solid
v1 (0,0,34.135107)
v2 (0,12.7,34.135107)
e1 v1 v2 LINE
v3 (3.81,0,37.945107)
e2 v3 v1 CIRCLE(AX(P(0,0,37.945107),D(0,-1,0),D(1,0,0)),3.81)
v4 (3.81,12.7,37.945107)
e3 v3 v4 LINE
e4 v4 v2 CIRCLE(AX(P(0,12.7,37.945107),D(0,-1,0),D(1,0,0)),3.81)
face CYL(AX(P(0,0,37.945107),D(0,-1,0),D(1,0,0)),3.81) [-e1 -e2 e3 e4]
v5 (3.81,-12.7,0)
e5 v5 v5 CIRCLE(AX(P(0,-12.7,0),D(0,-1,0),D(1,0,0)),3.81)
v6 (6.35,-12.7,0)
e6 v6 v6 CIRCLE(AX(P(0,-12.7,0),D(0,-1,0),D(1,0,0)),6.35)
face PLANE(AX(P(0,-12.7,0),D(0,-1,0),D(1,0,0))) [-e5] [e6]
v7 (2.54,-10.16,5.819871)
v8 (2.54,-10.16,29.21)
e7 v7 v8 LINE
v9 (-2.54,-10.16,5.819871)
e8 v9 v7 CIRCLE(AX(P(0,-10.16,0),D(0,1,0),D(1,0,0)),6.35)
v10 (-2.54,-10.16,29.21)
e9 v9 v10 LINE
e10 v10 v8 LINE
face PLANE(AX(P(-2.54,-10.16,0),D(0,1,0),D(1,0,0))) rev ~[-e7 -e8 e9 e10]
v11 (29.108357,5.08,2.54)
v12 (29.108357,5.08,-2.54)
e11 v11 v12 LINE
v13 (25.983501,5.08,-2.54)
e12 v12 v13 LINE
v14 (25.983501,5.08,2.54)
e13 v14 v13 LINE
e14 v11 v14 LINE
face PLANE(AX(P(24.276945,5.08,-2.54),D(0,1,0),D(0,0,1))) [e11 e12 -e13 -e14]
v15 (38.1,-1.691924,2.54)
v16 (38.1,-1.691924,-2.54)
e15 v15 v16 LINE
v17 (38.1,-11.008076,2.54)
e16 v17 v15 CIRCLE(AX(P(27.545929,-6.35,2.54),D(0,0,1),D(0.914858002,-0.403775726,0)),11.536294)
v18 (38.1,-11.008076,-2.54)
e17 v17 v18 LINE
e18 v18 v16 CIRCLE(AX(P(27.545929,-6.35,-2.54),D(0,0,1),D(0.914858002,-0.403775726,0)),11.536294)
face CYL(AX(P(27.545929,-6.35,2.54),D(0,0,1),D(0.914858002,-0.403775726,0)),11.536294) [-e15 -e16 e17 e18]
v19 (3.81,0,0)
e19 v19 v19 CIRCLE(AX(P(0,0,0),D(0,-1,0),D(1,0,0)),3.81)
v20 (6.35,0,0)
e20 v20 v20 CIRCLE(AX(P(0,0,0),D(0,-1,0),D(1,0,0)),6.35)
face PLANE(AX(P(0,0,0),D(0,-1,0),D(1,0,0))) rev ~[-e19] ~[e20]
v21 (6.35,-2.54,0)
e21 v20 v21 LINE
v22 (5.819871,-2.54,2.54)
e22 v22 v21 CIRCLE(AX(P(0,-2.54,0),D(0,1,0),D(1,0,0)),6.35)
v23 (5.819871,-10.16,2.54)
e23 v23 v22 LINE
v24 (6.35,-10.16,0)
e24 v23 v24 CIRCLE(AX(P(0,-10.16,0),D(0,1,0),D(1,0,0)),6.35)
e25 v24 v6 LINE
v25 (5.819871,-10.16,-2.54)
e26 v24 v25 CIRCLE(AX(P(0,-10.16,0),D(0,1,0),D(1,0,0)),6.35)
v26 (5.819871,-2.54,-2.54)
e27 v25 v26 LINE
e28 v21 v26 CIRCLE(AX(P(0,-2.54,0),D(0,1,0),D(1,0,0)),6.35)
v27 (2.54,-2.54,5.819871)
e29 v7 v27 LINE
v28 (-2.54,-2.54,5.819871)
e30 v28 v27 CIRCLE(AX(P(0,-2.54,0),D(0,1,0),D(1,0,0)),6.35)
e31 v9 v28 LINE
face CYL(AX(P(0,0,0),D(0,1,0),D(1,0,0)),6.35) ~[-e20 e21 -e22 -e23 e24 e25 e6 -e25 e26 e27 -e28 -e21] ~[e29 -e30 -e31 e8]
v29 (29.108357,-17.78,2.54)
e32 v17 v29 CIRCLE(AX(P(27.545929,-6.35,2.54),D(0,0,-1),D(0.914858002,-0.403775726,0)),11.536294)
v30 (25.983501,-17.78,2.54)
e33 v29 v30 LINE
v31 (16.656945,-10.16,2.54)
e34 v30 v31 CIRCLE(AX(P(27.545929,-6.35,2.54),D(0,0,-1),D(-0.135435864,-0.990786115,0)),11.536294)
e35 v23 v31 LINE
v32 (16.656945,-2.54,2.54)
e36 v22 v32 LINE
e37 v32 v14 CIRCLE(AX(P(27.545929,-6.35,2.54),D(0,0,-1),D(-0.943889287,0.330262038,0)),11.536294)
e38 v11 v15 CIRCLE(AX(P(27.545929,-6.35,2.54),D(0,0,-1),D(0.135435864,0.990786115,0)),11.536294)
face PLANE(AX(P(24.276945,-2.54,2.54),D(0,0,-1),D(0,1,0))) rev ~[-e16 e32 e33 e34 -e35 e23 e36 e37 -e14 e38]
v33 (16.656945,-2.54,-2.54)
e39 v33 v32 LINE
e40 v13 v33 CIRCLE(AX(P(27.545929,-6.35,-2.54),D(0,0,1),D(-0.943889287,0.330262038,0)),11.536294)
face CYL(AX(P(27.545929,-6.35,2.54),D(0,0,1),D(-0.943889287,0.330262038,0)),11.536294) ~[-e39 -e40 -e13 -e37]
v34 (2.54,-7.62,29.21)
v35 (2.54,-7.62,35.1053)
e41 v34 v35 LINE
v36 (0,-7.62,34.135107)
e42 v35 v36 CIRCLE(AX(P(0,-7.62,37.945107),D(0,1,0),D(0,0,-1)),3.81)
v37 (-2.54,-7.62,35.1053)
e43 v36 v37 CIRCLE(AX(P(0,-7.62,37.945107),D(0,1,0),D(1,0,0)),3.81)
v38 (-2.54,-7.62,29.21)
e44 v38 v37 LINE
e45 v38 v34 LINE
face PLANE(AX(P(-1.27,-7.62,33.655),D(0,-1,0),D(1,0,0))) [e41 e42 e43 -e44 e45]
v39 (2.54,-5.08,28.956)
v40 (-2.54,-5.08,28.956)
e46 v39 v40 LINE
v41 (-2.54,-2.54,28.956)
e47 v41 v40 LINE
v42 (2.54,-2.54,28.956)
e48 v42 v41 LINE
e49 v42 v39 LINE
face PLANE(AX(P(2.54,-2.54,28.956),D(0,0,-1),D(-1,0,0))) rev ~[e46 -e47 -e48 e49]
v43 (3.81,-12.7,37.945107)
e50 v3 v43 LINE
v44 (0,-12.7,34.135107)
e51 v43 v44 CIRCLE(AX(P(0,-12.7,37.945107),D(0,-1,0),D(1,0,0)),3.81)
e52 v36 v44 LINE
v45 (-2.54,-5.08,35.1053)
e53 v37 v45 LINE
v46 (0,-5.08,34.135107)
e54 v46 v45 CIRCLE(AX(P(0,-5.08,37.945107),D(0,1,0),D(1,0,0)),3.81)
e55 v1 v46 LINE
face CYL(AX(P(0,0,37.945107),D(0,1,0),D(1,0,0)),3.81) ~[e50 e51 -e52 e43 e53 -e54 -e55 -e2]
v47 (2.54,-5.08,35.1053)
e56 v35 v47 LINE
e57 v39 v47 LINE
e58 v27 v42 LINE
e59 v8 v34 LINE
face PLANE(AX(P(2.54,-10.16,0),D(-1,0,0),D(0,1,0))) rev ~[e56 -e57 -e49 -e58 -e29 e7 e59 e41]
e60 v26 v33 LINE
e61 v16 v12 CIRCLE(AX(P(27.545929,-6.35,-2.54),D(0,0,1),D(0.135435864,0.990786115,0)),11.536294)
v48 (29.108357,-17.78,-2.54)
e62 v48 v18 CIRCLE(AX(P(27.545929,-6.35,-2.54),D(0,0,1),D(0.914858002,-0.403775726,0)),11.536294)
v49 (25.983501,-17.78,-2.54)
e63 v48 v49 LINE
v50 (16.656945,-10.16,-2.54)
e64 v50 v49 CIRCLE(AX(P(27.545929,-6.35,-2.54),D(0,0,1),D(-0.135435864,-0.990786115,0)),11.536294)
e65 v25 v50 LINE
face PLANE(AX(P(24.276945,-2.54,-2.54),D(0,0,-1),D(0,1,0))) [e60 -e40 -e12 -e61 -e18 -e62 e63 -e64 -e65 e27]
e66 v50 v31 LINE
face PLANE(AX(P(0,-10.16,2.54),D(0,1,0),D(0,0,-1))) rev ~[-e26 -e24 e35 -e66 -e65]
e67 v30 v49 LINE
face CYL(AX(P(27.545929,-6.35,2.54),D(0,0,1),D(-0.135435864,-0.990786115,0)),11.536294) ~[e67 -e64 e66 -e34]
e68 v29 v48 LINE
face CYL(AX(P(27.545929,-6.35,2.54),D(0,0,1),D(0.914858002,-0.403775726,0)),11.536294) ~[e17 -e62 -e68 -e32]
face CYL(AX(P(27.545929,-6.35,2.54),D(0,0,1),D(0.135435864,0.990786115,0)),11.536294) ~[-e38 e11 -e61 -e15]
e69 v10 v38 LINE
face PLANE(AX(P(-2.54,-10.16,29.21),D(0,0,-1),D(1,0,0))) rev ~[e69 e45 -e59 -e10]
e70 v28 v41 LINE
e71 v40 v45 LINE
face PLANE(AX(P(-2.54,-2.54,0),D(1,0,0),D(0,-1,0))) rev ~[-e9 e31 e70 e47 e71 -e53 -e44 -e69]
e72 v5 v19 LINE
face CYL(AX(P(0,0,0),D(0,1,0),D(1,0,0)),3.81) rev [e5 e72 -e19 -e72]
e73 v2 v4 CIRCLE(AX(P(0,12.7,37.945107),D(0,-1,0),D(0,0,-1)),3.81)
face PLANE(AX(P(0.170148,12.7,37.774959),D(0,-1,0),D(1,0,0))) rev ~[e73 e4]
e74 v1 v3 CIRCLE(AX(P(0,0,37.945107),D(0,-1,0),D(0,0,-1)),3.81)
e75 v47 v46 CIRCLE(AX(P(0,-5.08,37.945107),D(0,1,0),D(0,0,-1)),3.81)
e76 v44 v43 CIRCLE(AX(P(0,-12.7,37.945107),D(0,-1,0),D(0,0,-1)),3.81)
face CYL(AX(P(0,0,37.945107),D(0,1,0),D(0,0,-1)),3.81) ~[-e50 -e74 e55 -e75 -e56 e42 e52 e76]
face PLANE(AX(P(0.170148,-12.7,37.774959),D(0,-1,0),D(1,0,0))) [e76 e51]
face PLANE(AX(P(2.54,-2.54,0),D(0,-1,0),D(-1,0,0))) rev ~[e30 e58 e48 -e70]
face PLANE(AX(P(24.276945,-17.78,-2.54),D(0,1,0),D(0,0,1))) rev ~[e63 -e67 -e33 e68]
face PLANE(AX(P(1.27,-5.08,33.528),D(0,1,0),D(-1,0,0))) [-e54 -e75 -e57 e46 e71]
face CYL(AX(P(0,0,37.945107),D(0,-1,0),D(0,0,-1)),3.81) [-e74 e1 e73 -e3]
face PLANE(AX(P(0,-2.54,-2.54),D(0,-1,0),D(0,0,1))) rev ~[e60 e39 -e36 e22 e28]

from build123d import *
from build123d import SkipClean  # not in build123d's __all__

# Parameters (mm, degrees)
F0_R           = 6.35
F0_R_2         = 3.81
F1_DEPTH       = 12.7
F4_DEPTH       = 38.1
F5_DEPTH       = 25.4
F5_DEPTH_BACK  = 25.4
F6_W           = 13.8230553448
F6_H           = 5.08
F7_DEPTH       = 7.62
F7_DEPTH_BACK  = 15.24
F8_DEPTH       = 7.62
F9_DEPTH       = 7.62
F11_DEPTH      = 25.4
F12_DEPTH      = 5.08
F14_DEPTH      = 38.1
F15_DEPTH      = 25.4
F16_W          = 2.54
F16_H          = 9.144
F17_DEPTH      = 2.54
F18_W          = 2.54
F18_H          = 8.89
F19_DEPTH      = 2.54
F21_DEPTH      = 12.7
F21_DEPTH_BACK = 12.7


with BuildPart() as f1:
    # F0 (on Front) → F1 (new body)
    with BuildSketch(Plane.XZ):
        Circle(F0_R)
        Circle(F0_R_2, mode=Mode.SUBTRACT)
    extrude(amount=F1_DEPTH)

    # F3 (on Right) → F4 (join)
    with BuildSketch(Plane.YZ):
        Polygon((-2.54, -2.54), (-2.54, 0), (-2.54, 2.54), (-10.16, 2.54), (-10.16, 0), (-10.16, -2.54), align=None)
    extrude(amount=F4_DEPTH)

    # F0 (on Front) → F5 (cut, two sides)
    with BuildSketch(Plane.XZ) as f5_sk:
        Circle(F0_R_2)
    extrude(amount=F5_DEPTH, mode=Mode.SUBTRACT)
    extrude(f5_sk.sketch, amount=-F5_DEPTH_BACK, mode=Mode.SUBTRACT)

    # F6 (on face) → F7 (join, two sides)
    with BuildSketch(Plane.XZ.offset(10.16)) as f7_sk:
        with Locations((31.1884723276, 0)):
            Rectangle(F6_W, F6_H)
    extrude(amount=F7_DEPTH)
    extrude(f7_sk.sketch, amount=-F7_DEPTH_BACK)

    # F8 (add): a face of the model
    f8_faces = [f1.faces().sort_by_distance(p)[0] for p in [
        (24.2769446552, -13.97, 0),
    ]]
    extrude(f8_faces, amount=F8_DEPTH)

    # F9 (add): a face of the model
    f9_faces = [f1.faces().sort_by_distance(p)[0] for p in [
        (24.2769446552, 1.27, 0),
    ]]
    extrude(f9_faces, amount=F9_DEPTH)

    # F10 (on face) → F11 (cut)
    with BuildSketch(Plane.XY.offset(2.54)):
        with BuildLine():
            ThreePointArc((25.9835010893, -17.78), (20.2469210754, -15.2836758241), (16.6569446552, -10.16))
            Line((16.6569446552, -10.16), (16.6569446552, -17.78))
            Line((16.6569446552, -17.78), (25.9835010893, -17.78))
        make_face()
        with BuildLine():
            Line((16.6569446552, 5.08), (16.6569446552, -2.54))
            ThreePointArc((16.6569446552, -2.54), (20.2469210754, 2.5836758241), (25.9835010893, 5.08))
            Line((25.9835010893, 5.08), (16.6569446552, 5.08))
        make_face()
        with BuildLine():
            Line((38.1, 5.08), (29.1083570088, 5.08))
            ThreePointArc((29.1083570088, 5.08), (34.4861831348, 2.8651480918), (38.1, -1.6919244863))
            Line((38.1, -1.6919244863), (38.1, 5.08))
        make_face()
        with BuildLine():
            Line((38.1, -17.78), (38.1, -11.0080755137))
            ThreePointArc((38.1, -11.0080755137), (34.4861831348, -15.5651480918), (29.1083570088, -17.78))
            Line((29.1083570088, -17.78), (38.1, -17.78))
        make_face()
    extrude(amount=-F11_DEPTH, mode=Mode.SUBTRACT)

    # F10 (on face) → F12 (join)
    with BuildSketch(Plane.XY.offset(2.54)):
        with BuildLine():
            ThreePointArc((38.1, -11.0080755137), (39.0822231303, -6.35), (38.1, -1.6919244863))
            Line((38.1, -1.6919244863), (38.1, -11.0080755137))
        make_face()
    with SkipClean():  # cleaning this boolean's faces spoils the solid; the shape is the same uncleaned
        extrude(amount=-F12_DEPTH)

    # F13 (on Top) → F14 (join)
    with BuildSketch(Plane.XY):
        Polygon((2.54, -2.54), (0, -2.54), (-2.54, -2.54), (-2.54, -10.16), (0, -10.16), (2.54, -10.16), align=None)
    extrude(amount=F14_DEPTH)

    # F0 (on Front) → F15 (cut)
    with BuildSketch(Plane.XZ):
        Circle(F0_R_2)
    extrude(amount=F15_DEPTH, mode=Mode.SUBTRACT)

    # F16 (on face) → F17 (cut)
    with BuildSketch(Plane(origin=(0, -2.54, 0), x_dir=(-1, 0, 0), z_dir=(0, 1, 0))):
        with Locations((-1.27, 33.528)):
            Rectangle(F16_W, F16_H)
        with Locations((1.27, 33.528)):
            Rectangle(F16_W, F16_H)
    extrude(amount=-F17_DEPTH, mode=Mode.SUBTRACT)

    # F18 (on face) → F19 (cut)
    with BuildSketch(Plane.XZ.offset(10.16)):
        with Locations((-1.27, 33.655)):
            Rectangle(F18_W, F18_H)
        with Locations((1.27, 33.655)):
            Rectangle(F18_W, F18_H)
    extrude(amount=-F19_DEPTH, mode=Mode.SUBTRACT)

    # F20 (on Front) → F21 (join, two sides)
    with BuildSketch(Plane.XZ) as f21_sk:
        with BuildLine():
            ThreePointArc((0, 34.1351066256), (2.6940768363, 35.2510297892), (3.81, 37.9451066256))
            ThreePointArc((3.81, 37.9451066256), (-2.6940768363, 40.6391834619), (0, 34.1351066256))
        make_face()
    extrude(amount=F21_DEPTH)
    extrude(f21_sk.sketch, amount=-F21_DEPTH_BACK)


solid = f1.part
